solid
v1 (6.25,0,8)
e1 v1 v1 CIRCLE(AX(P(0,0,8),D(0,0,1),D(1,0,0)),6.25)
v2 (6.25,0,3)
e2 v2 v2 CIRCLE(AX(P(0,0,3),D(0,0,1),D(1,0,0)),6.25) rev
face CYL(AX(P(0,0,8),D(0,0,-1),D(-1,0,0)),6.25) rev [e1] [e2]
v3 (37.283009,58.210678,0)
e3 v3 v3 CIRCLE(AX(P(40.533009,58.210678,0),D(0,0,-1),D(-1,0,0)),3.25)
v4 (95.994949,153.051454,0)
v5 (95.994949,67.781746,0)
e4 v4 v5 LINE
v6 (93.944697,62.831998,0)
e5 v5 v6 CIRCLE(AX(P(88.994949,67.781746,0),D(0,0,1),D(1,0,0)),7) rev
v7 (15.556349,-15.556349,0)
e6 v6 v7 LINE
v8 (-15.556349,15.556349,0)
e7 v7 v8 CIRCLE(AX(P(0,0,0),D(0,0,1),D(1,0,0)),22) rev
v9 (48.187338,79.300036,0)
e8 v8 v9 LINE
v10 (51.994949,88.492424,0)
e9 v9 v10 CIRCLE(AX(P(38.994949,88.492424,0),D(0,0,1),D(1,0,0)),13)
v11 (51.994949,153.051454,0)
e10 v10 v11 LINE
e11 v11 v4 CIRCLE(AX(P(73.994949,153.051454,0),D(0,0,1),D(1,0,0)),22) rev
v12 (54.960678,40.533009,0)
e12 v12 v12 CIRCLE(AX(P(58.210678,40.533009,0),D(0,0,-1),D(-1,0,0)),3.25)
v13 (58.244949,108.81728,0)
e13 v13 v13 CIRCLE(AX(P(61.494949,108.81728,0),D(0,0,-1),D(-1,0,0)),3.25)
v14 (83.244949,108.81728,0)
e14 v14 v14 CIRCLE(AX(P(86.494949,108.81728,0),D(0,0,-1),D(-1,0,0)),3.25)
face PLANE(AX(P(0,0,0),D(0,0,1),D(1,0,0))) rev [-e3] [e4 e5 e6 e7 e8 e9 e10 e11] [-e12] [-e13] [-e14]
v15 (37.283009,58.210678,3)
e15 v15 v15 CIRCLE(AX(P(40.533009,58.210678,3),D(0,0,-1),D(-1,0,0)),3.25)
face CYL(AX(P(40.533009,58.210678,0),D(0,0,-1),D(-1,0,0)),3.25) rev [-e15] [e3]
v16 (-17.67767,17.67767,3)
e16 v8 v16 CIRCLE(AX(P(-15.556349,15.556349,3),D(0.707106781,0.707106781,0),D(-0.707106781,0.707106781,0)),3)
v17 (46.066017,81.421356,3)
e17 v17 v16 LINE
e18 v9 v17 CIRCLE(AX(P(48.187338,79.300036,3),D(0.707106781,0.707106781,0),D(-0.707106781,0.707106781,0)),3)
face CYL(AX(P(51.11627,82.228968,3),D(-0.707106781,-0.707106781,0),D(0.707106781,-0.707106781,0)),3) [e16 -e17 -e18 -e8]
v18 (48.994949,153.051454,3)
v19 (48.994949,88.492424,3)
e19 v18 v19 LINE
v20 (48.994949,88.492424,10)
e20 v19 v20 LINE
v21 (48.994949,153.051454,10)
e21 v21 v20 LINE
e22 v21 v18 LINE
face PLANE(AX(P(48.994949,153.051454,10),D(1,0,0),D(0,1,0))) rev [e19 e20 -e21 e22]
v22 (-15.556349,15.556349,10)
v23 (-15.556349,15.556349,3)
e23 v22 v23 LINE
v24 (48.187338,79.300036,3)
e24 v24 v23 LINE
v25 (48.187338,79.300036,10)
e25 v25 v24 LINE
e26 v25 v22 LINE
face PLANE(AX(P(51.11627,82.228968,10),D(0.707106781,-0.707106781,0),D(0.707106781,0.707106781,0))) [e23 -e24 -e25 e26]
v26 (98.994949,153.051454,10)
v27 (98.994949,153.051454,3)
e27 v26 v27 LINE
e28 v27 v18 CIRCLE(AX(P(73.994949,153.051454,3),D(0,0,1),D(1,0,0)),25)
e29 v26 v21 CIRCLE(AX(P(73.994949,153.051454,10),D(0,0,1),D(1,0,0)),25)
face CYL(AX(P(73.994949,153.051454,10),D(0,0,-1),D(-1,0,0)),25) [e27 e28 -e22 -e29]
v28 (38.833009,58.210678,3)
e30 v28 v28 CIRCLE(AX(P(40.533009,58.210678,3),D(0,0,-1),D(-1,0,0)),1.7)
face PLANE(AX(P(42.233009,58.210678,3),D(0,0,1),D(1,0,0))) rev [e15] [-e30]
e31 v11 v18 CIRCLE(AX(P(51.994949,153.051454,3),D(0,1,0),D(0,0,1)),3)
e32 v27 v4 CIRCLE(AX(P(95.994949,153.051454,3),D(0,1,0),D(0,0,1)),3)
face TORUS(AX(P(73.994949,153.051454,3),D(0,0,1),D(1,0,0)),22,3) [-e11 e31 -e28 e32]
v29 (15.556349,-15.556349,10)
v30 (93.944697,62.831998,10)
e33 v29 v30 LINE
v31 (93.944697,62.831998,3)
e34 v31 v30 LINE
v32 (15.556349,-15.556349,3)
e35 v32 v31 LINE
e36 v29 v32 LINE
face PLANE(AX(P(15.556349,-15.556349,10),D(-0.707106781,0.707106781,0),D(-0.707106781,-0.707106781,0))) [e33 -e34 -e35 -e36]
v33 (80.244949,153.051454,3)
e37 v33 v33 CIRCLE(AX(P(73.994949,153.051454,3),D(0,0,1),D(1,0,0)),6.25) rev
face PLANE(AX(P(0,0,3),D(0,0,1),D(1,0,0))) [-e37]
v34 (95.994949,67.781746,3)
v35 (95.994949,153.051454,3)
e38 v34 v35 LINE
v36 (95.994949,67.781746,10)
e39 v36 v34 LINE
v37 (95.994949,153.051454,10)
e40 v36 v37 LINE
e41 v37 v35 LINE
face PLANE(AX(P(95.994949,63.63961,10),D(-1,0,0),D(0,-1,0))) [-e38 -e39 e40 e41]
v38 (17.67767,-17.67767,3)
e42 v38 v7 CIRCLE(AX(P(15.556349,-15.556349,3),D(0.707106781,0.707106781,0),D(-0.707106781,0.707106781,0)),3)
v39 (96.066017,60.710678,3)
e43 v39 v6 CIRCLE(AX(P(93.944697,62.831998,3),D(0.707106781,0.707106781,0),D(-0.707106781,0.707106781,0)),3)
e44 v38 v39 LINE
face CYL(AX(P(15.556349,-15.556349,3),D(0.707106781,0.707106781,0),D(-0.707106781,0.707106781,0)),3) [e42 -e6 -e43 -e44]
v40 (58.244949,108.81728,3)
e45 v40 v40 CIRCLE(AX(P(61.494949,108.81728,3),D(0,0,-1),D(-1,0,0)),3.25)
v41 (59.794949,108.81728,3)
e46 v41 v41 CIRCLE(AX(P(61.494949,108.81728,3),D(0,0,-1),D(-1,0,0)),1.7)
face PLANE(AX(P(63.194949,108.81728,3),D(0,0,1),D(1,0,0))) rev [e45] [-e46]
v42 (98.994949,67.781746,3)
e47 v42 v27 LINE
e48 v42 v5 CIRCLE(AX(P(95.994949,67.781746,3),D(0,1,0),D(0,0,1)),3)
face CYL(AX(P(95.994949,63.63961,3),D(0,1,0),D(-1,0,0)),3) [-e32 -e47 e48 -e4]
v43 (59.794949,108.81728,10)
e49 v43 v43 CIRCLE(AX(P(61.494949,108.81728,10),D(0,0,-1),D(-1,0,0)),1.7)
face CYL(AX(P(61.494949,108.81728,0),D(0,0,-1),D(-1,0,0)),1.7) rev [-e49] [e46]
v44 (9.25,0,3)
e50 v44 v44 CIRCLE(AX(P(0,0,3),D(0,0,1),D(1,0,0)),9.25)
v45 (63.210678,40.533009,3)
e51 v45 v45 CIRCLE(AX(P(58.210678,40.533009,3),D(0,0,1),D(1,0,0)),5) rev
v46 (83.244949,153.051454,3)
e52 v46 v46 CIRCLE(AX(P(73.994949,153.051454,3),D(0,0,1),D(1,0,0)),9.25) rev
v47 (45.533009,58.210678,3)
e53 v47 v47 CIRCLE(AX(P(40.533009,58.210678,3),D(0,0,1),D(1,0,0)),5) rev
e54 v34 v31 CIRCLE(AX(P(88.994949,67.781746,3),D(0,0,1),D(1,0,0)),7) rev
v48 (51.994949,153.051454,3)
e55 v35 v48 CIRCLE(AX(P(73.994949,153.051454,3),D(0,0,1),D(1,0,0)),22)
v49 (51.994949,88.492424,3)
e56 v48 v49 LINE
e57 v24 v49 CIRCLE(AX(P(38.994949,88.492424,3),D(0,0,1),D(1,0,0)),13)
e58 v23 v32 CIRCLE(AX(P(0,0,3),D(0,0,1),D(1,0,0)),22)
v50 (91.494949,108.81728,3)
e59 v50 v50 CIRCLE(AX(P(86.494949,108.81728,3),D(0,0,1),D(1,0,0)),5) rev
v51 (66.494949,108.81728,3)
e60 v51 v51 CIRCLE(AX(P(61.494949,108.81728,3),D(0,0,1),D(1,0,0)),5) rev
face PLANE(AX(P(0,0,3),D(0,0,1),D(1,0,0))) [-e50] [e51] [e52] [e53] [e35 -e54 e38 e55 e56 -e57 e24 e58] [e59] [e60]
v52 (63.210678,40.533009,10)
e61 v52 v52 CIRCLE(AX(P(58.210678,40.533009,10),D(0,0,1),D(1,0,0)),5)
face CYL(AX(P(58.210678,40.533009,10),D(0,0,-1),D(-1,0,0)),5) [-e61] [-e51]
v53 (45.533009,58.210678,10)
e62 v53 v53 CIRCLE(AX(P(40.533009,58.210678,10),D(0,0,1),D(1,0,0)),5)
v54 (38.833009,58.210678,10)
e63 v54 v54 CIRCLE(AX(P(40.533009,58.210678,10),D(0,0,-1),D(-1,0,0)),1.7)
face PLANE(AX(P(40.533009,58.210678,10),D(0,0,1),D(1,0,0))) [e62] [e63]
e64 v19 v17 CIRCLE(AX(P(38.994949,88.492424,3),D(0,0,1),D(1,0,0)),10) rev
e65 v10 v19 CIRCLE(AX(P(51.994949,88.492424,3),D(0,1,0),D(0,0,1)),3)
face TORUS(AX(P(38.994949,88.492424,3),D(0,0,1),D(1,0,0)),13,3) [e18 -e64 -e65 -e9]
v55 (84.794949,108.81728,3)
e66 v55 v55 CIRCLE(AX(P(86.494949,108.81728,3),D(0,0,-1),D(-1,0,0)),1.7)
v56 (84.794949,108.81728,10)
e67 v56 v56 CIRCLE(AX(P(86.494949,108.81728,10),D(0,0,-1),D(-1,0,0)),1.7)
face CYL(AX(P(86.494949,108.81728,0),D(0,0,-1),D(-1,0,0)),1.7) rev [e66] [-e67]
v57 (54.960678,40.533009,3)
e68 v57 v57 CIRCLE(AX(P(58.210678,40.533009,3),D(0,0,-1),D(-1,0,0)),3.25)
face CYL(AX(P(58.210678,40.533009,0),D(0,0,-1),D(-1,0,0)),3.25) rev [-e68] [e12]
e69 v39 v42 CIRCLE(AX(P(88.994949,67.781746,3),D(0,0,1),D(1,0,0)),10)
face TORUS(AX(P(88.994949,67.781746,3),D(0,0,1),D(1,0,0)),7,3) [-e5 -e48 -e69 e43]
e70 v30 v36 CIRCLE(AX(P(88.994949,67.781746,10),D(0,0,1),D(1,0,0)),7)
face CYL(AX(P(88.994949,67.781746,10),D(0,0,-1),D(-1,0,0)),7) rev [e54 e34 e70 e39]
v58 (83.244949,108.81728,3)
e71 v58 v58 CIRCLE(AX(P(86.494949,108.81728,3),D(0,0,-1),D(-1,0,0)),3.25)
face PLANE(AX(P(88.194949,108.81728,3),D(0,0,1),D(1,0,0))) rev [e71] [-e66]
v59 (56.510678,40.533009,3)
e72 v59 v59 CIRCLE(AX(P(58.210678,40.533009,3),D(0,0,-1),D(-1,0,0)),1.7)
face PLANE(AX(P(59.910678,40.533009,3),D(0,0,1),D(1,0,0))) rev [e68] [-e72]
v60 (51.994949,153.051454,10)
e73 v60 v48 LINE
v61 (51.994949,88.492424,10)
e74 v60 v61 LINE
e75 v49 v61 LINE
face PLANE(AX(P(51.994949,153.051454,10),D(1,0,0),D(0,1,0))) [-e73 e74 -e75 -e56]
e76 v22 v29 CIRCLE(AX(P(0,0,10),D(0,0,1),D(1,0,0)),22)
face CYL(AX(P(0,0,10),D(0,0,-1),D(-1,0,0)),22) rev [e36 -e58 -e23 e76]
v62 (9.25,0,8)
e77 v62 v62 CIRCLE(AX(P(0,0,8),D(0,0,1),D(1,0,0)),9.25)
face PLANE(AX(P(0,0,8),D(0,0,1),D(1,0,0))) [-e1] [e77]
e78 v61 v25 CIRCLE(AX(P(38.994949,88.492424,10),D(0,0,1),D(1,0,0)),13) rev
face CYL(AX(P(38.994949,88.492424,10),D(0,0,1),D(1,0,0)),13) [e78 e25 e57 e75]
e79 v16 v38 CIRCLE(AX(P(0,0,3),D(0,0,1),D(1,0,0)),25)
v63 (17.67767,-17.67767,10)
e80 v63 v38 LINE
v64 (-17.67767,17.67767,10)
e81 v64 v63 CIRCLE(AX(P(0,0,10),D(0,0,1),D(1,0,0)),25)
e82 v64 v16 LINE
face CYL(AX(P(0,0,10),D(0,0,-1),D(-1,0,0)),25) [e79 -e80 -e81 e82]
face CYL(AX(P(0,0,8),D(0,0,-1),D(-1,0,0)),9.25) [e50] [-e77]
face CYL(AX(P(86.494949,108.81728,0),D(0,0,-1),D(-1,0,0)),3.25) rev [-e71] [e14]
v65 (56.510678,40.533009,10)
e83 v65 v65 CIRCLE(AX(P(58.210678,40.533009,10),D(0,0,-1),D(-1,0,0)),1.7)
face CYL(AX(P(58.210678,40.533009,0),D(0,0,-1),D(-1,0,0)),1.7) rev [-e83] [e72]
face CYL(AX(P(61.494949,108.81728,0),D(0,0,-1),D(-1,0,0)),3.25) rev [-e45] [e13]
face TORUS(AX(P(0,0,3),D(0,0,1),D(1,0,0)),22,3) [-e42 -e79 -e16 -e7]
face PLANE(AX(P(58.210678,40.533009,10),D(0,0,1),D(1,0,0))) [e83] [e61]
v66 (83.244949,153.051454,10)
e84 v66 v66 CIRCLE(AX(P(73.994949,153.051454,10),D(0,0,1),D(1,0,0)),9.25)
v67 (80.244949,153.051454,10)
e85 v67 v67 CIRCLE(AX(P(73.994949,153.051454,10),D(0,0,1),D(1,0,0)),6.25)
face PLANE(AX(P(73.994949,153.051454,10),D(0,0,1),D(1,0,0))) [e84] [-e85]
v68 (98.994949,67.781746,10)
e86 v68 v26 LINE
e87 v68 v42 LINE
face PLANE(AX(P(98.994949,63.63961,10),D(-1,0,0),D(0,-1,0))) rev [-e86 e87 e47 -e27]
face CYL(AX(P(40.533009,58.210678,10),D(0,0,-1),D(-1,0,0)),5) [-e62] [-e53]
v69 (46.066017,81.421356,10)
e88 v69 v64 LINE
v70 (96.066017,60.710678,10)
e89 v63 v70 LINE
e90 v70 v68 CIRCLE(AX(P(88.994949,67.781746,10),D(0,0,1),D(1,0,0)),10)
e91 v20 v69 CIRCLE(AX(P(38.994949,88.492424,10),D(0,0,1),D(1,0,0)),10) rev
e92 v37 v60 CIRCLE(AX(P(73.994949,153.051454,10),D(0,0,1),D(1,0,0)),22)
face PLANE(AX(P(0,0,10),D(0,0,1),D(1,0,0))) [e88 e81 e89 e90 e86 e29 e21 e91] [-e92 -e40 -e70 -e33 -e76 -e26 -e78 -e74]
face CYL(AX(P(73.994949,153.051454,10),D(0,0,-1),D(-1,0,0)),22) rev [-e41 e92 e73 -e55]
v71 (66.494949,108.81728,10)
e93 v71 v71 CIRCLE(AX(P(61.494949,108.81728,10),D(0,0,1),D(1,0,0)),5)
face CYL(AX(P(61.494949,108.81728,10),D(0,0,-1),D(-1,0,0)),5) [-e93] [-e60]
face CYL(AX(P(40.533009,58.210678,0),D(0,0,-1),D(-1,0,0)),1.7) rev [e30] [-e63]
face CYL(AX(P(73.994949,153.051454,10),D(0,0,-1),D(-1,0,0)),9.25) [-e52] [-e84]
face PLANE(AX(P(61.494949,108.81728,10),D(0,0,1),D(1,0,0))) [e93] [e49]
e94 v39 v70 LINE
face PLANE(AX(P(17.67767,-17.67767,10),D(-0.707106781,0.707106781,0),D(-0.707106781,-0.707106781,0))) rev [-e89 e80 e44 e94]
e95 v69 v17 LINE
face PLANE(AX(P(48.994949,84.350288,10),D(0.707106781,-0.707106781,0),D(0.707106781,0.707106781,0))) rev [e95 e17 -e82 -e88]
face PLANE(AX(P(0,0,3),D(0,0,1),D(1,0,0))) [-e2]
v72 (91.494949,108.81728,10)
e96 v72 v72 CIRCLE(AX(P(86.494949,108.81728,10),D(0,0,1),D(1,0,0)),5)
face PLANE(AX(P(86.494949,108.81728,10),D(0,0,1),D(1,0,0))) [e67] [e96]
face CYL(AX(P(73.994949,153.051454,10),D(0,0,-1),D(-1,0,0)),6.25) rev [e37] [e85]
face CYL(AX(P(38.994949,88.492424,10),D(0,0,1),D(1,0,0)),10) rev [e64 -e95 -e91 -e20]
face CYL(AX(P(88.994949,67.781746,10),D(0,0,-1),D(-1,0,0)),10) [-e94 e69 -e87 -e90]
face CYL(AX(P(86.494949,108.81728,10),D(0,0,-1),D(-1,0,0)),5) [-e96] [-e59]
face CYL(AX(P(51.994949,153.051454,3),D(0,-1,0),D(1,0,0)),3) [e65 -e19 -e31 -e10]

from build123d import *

# Parameters (mm, degrees)
BOSS_EXTRUDE1_DEPTH                          = 10
FILLET1_R                                    = 10
SHELL1_T                                     = -3
FILLET4_R                                    = 3
SKETCH2_R                                    = 9.25
BOSS_EXTRUDE2_DEPTH                          = 5
BOSS_EXTRUDE5_START                          = -3
SKETCH18_R                                   = 9.25
BOSS_EXTRUDE5_DEPTH                          = 10
SHELL2_START                                 = 3
SHELL2_OUTLINE_R                             = 6.25
SHELL2_DEPTH                                 = 7
SKETCH17_R                                   = 5
BOSS_EXTRUDE4_DEPTH                          = 10
CBORE_FOR_M5_HEX_HEAD_CAP_SCREW3_D           = 3.4
CBORE_FOR_M5_HEX_HEAD_CAP_SCREW3_CBORE_D     = 6.5
CBORE_FOR_M5_HEX_HEAD_CAP_SCREW3_CBORE_DEPTH = 3


# Read off the part's stored shape, not the designer's step: Shell2
with BuildPart() as part:
    # Sketch1 → Boss-Extrude1 (new body)
    with BuildSketch(Plane.XY):
        with BuildLine():
            Line((17.67766953, -17.67766953), (98.994949366, 63.639610307))
            Line((98.994949366, 63.639610307), (98.994949366, 153.051453663))
            ThreePointArc((98.994949366, 153.051453663), (73.994949366, 178.051453663), (48.994949366, 153.051453663))
            Line((48.994949366, 153.051453663), (48.994949366, 84.350288425))
            Line((48.994949366, 84.350288425), (-17.67766953, 17.67766953))
            ThreePointArc((-17.67766953, 17.67766953), (-17.67766953, -17.67766953), (17.67766953, -17.67766953))
        make_face()
    extrude(amount=BOSS_EXTRUDE1_DEPTH)

    # Fillet1
    fillet1_edges = [part.edges().sort_by_distance(p)[0] for p in [
        (48.994949366, 84.350288425, 5),
        (98.994949366, 63.639610307, 5),
    ]]
    fillet(fillet1_edges, radius=FILLET1_R)

    # Shell1
    shell1_openings = [part.faces().sort_by_distance(p)[0] for p in [
        (50.162308395, 71.072674162, 10),
    ]]
    offset(amount=SHELL1_T, openings=shell1_openings, kind=Kind.INTERSECTION)

    # Fillet4
    fillet4_edges = [part.edges().sort_by_distance(p)[0] for p in [
        (98.994949366, 110.416599797, 0),
        (14.194173824, 49.549512883, 0),
        (98.233744691, 63.954911607, 0),
        (48.233744691, 84.665589726, 0),
        (48.994949366, 120.771938856, 0),
        (73.994949366, 178.051453663, 0),
        (56.871843354, 21.516504294, 0),
        (-17.67766953, -17.67766953, 0),
    ]]
    fillet(fillet4_edges, radius=FILLET4_R)

    # Sketch2 → Boss-Extrude2 (add)
    with BuildSketch(Plane.XY.offset(3)):
        Circle(SKETCH2_R)
    extrude(amount=BOSS_EXTRUDE2_DEPTH)

    # Sketch18 → Boss-Extrude5 (add)
    with BuildSketch(Plane.XY.offset(3).offset(BOSS_EXTRUDE5_START)):
        with Locations((73.994949366, 153.051453663)):
            Circle(SKETCH18_R)
    extrude(amount=BOSS_EXTRUDE5_DEPTH)

    # Shell2 outline → Shell2 (cut)
    with BuildSketch(Plane.XY.offset(SHELL2_START)):
        with Locations((73.994949366, 153.051453663)):
            Circle(SHELL2_OUTLINE_R)
        Circle(SHELL2_OUTLINE_R)
    extrude(amount=SHELL2_DEPTH, mode=Mode.SUBTRACT)

    # Sketch17 → Boss-Extrude4 (add)
    with BuildSketch(Plane.XY):
        with Locations((40.533008589, 58.210678119)):
            Circle(SKETCH17_R)
        with Locations((61.494949366, 108.817279836)):
            Circle(SKETCH17_R)
        with Locations((86.494949366, 108.817279836)):
            Circle(SKETCH17_R)
        with Locations((58.210678119, 40.533008589)):
            Circle(SKETCH17_R)
    extrude(amount=BOSS_EXTRUDE4_DEPTH)

    # CBORE for M5 Hex Head Cap Screw3 (through all)
    with Locations(Plane(origin=(0, 0, 0), x_dir=(-1, 0, 0), z_dir=(0, 0, -1))):
        with Locations((-86.494949366, 108.817279836), (-61.494949366, 108.817279836), (-58.210678119, 40.533008589), (-40.533008589, 58.210678119)):
            CounterBoreHole(CBORE_FOR_M5_HEX_HEAD_CAP_SCREW3_D / 2, CBORE_FOR_M5_HEX_HEAD_CAP_SCREW3_CBORE_D / 2, CBORE_FOR_M5_HEX_HEAD_CAP_SCREW3_CBORE_DEPTH)


solid = part.part
